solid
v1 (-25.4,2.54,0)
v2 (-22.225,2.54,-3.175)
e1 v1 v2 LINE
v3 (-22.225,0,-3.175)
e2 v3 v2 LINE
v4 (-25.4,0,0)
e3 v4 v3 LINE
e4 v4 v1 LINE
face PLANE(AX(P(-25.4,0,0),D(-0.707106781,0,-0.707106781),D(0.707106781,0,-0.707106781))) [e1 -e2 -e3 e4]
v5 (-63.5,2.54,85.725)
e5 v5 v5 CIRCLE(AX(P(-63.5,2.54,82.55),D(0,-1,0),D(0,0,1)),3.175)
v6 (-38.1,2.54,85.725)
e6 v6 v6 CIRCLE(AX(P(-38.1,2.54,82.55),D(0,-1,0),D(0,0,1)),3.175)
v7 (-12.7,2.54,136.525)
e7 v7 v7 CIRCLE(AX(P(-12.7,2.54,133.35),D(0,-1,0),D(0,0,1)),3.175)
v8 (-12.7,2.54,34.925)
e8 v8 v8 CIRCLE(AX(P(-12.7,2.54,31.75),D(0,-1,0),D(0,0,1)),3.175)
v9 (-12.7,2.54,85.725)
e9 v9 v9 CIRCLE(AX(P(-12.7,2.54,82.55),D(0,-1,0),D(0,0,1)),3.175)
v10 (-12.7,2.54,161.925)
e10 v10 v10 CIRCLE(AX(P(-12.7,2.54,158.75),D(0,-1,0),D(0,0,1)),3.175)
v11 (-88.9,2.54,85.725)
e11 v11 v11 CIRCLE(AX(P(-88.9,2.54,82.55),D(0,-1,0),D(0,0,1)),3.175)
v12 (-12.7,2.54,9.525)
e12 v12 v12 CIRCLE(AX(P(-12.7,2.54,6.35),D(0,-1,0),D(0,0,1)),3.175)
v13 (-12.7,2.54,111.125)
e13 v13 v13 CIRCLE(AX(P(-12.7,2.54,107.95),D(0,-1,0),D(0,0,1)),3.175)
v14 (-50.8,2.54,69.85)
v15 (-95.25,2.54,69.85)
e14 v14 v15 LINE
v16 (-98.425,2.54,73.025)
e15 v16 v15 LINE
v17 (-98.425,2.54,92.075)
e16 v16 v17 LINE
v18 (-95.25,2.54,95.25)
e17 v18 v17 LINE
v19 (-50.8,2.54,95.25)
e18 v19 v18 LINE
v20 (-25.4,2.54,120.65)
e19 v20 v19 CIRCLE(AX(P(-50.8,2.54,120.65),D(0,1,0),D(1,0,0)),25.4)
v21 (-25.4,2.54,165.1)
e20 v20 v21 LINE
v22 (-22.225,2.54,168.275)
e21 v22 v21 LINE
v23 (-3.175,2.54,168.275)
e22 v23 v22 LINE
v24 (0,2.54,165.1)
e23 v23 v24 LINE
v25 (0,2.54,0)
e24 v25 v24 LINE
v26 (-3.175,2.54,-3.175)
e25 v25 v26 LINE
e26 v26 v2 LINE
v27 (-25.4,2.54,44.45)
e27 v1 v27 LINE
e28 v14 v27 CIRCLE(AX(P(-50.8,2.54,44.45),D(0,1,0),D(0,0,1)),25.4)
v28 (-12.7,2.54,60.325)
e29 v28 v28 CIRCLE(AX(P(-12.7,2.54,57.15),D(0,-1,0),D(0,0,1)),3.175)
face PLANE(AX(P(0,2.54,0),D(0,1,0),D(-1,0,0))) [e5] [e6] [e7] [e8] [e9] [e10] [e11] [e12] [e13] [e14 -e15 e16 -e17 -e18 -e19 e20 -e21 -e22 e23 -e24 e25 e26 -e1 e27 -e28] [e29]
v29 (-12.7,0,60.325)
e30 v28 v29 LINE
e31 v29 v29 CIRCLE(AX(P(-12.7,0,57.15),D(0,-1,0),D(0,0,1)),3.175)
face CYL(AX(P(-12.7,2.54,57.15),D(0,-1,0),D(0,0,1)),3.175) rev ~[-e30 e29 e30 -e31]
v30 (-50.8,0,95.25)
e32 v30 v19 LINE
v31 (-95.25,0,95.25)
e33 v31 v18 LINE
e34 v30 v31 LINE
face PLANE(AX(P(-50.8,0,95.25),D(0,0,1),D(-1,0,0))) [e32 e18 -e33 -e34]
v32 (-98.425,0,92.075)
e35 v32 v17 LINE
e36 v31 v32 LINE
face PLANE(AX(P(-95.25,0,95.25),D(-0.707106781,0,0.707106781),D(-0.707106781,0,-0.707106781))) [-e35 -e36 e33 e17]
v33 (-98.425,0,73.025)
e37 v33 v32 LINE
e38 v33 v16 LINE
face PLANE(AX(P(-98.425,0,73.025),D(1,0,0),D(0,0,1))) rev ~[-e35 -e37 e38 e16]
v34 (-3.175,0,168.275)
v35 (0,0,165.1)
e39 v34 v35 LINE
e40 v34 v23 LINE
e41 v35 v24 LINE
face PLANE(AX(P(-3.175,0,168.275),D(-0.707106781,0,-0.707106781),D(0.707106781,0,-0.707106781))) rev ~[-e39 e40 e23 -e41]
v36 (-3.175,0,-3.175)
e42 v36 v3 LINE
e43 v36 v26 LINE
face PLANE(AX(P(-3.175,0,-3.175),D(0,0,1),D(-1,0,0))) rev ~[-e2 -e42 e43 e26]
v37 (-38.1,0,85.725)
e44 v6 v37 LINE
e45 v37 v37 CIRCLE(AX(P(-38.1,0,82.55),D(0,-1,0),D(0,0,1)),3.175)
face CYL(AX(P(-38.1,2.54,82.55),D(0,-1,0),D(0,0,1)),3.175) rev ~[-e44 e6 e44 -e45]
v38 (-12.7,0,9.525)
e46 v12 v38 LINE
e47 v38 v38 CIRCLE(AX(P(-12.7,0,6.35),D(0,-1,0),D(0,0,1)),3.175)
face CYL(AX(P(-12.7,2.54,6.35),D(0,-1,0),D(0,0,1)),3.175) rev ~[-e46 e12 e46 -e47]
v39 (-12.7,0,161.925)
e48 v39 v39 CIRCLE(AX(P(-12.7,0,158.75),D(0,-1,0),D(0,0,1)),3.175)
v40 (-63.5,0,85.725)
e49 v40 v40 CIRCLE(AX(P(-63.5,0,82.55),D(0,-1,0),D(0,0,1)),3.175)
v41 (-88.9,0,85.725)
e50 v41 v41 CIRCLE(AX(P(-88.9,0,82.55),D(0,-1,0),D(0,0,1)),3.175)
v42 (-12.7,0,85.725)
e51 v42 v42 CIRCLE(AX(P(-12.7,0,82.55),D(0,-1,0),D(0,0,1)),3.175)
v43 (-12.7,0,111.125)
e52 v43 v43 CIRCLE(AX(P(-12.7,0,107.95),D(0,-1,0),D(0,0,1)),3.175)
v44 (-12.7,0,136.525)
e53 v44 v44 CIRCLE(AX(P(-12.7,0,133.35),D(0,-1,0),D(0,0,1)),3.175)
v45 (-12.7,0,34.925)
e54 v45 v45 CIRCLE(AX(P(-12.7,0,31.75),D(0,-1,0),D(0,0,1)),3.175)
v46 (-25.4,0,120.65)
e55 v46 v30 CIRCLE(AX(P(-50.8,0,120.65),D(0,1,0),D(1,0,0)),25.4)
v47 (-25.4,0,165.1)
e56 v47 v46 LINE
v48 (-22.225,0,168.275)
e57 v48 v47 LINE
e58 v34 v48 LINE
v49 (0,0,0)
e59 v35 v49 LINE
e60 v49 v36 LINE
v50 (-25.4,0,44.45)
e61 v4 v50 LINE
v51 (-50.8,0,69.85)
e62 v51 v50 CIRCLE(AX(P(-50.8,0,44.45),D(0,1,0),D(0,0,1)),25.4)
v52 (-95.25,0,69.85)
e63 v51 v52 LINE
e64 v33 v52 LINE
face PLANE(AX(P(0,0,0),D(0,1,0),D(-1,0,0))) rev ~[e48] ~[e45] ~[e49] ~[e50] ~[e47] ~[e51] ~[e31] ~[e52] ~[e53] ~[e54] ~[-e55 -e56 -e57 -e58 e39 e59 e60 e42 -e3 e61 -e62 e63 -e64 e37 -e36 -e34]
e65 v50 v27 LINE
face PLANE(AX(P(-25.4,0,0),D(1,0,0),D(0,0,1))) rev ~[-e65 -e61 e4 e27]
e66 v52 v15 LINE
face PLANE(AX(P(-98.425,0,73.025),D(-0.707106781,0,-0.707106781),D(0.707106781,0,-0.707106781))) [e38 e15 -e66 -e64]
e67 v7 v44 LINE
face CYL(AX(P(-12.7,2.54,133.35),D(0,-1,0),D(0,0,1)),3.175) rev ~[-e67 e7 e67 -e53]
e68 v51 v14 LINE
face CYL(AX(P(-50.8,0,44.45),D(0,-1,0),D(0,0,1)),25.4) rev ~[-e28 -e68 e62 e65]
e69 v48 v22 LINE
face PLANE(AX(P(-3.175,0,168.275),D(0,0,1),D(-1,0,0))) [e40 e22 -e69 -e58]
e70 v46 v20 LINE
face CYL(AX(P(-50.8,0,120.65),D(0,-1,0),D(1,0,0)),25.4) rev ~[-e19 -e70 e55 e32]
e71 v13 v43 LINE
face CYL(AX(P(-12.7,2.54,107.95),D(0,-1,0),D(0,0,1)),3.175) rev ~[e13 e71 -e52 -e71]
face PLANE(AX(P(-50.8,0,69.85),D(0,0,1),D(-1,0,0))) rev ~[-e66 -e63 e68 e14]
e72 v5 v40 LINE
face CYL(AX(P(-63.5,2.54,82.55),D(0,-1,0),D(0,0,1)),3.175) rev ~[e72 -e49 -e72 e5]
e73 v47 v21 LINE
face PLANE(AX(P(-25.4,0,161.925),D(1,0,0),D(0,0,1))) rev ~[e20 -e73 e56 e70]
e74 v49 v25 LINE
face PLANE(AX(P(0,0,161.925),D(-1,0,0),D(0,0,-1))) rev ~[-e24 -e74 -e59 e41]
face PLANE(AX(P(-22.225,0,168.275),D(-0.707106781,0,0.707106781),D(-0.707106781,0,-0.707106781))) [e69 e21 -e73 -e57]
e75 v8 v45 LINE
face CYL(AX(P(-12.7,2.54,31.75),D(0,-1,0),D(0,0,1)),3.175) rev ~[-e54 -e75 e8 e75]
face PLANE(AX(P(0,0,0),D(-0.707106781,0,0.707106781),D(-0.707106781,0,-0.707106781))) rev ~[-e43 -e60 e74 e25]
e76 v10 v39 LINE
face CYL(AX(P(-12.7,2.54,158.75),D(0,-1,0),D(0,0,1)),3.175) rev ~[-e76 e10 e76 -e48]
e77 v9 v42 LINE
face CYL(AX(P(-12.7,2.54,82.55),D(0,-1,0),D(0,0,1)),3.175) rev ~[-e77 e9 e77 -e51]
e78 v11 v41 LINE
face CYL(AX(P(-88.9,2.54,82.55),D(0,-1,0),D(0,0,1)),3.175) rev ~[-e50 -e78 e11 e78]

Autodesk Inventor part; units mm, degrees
ref_plane "YZ Plane" through (0, 0, 0) normal (1, 0, 0) x (0, 1, 0)
ref_plane "XZ Plane" through (0, 0, 0) normal (0, 1, 0) x (-1, 0, 0)
ref_plane "XY Plane" through (0, 0, 0) normal (0, 0, 1) x (1, 0, 0)
sketch "Sketch1" plane through (0, 0, 0) normal (0, 1, 0) x (-1, 0, 0)
  line L0 (3.175, -3.175) -> (22.225, -3.175)
  line L1 (0, 161.925) -> (0, 0)
  line L2 (25.4, 161.925) -> (25.4, 120.65)
  line L3 (50.8, 95.25) -> (95.25, 95.25)
  line L4 (25.4, 0) -> (25.4, 44.45)
  line L5 (50.8, 69.85) -> (95.25, 69.85)
  arc A0 (25.4, 120.65) -> (50.8, 95.25) centre (50.8, 120.65) ccw
  line L6 (0, 0) -> (3.175, -3.175)
  line L7 (25.4, 0) -> (22.225, -3.175)
  arc A1 (50.8, 69.85) -> (25.4, 44.45) centre (50.8, 44.45) ccw
  line L8 (98.425, 73.025) -> (98.425, 92.075)
  line L9 (98.425, 73.025) -> (95.25, 69.85)
  line L10 (95.25, 95.25) -> (98.425, 92.075)
  line L11 (25.4, 161.925) -> (25.4, 165.1)
  line L12 (0, 161.925) -> (0, 165.1)
  line L13 (0, 165.1) -> (0, 165.1)
  line L14 (3.175, 168.275) -> (22.225, 168.275)
  line L15 (25.4, 165.1) -> (25.4, 165.1)
  line L16 (22.225, 168.275) -> (25.4, 165.1)
  line L17 (3.175, 168.275) -> (0, 165.1)
  point P0 (92.075, 69.85)
  point P1 (95.25, 69.85)
  point P2 (0, 168.275)
  point P3 (25.4, 168.275)
  dimension "d6" = 25.4
  dimension "d21" = 25.4
  dimension "d44" = 165.1
  dimension "d63" = 44.45
  dimension "d64" = 44.45
  dimension "d65" = 3.175
  dimension "d67" = 3.175
  dimension "d70" = 3.175
  dimension "d91" = 3.175
  dimension "d92" = 3.175
  dimension "d93" = 3.175
  dimension "d94" = 3.175
extrude "Extrusion1" add sketch "Sketch1" along normal blind 2.54
hole "Hole2" at (-12.7, 2.54, 82.55) direction (0, -1, 0) diameter 6.35 end through all
pattern_linear "Rectangular Pattern4" count 4 spacing 25.4 along (-1, 0, 0) of "Hole2"
pattern_linear "Rectangular Pattern5" count 7 spacing 25.4 along (0, 0, -1) of "Hole2" first direction both ways yes
equation "\"d21\" = d6"
equation "\"d67\" = d65"
equation "\"d92\" = d91"
equation "\"d93\" = d91"
equation "\"d94\" = d93"
equation "\"d79\" = Thickness"
equation "\"BendRadius\" = Thickness"
equation "\"BendReliefWidth\" = Thickness"
equation "\"BendReliefDepth\" = 0.5 * Thickness"
equation "\"CornerReliefSize\" = 4 * Thickness"
equation "\"MinimumRemnant\" = 2 * Thickness"
equation "\"TransitionRadius\" = BendRadius"
equation "\"JacobiRadiusSize\" = BendRadius"
equation "\"GapSize\" = Thickness"
equation "\"Thickness\" = 3.048"
properties part number "T-gusset"
